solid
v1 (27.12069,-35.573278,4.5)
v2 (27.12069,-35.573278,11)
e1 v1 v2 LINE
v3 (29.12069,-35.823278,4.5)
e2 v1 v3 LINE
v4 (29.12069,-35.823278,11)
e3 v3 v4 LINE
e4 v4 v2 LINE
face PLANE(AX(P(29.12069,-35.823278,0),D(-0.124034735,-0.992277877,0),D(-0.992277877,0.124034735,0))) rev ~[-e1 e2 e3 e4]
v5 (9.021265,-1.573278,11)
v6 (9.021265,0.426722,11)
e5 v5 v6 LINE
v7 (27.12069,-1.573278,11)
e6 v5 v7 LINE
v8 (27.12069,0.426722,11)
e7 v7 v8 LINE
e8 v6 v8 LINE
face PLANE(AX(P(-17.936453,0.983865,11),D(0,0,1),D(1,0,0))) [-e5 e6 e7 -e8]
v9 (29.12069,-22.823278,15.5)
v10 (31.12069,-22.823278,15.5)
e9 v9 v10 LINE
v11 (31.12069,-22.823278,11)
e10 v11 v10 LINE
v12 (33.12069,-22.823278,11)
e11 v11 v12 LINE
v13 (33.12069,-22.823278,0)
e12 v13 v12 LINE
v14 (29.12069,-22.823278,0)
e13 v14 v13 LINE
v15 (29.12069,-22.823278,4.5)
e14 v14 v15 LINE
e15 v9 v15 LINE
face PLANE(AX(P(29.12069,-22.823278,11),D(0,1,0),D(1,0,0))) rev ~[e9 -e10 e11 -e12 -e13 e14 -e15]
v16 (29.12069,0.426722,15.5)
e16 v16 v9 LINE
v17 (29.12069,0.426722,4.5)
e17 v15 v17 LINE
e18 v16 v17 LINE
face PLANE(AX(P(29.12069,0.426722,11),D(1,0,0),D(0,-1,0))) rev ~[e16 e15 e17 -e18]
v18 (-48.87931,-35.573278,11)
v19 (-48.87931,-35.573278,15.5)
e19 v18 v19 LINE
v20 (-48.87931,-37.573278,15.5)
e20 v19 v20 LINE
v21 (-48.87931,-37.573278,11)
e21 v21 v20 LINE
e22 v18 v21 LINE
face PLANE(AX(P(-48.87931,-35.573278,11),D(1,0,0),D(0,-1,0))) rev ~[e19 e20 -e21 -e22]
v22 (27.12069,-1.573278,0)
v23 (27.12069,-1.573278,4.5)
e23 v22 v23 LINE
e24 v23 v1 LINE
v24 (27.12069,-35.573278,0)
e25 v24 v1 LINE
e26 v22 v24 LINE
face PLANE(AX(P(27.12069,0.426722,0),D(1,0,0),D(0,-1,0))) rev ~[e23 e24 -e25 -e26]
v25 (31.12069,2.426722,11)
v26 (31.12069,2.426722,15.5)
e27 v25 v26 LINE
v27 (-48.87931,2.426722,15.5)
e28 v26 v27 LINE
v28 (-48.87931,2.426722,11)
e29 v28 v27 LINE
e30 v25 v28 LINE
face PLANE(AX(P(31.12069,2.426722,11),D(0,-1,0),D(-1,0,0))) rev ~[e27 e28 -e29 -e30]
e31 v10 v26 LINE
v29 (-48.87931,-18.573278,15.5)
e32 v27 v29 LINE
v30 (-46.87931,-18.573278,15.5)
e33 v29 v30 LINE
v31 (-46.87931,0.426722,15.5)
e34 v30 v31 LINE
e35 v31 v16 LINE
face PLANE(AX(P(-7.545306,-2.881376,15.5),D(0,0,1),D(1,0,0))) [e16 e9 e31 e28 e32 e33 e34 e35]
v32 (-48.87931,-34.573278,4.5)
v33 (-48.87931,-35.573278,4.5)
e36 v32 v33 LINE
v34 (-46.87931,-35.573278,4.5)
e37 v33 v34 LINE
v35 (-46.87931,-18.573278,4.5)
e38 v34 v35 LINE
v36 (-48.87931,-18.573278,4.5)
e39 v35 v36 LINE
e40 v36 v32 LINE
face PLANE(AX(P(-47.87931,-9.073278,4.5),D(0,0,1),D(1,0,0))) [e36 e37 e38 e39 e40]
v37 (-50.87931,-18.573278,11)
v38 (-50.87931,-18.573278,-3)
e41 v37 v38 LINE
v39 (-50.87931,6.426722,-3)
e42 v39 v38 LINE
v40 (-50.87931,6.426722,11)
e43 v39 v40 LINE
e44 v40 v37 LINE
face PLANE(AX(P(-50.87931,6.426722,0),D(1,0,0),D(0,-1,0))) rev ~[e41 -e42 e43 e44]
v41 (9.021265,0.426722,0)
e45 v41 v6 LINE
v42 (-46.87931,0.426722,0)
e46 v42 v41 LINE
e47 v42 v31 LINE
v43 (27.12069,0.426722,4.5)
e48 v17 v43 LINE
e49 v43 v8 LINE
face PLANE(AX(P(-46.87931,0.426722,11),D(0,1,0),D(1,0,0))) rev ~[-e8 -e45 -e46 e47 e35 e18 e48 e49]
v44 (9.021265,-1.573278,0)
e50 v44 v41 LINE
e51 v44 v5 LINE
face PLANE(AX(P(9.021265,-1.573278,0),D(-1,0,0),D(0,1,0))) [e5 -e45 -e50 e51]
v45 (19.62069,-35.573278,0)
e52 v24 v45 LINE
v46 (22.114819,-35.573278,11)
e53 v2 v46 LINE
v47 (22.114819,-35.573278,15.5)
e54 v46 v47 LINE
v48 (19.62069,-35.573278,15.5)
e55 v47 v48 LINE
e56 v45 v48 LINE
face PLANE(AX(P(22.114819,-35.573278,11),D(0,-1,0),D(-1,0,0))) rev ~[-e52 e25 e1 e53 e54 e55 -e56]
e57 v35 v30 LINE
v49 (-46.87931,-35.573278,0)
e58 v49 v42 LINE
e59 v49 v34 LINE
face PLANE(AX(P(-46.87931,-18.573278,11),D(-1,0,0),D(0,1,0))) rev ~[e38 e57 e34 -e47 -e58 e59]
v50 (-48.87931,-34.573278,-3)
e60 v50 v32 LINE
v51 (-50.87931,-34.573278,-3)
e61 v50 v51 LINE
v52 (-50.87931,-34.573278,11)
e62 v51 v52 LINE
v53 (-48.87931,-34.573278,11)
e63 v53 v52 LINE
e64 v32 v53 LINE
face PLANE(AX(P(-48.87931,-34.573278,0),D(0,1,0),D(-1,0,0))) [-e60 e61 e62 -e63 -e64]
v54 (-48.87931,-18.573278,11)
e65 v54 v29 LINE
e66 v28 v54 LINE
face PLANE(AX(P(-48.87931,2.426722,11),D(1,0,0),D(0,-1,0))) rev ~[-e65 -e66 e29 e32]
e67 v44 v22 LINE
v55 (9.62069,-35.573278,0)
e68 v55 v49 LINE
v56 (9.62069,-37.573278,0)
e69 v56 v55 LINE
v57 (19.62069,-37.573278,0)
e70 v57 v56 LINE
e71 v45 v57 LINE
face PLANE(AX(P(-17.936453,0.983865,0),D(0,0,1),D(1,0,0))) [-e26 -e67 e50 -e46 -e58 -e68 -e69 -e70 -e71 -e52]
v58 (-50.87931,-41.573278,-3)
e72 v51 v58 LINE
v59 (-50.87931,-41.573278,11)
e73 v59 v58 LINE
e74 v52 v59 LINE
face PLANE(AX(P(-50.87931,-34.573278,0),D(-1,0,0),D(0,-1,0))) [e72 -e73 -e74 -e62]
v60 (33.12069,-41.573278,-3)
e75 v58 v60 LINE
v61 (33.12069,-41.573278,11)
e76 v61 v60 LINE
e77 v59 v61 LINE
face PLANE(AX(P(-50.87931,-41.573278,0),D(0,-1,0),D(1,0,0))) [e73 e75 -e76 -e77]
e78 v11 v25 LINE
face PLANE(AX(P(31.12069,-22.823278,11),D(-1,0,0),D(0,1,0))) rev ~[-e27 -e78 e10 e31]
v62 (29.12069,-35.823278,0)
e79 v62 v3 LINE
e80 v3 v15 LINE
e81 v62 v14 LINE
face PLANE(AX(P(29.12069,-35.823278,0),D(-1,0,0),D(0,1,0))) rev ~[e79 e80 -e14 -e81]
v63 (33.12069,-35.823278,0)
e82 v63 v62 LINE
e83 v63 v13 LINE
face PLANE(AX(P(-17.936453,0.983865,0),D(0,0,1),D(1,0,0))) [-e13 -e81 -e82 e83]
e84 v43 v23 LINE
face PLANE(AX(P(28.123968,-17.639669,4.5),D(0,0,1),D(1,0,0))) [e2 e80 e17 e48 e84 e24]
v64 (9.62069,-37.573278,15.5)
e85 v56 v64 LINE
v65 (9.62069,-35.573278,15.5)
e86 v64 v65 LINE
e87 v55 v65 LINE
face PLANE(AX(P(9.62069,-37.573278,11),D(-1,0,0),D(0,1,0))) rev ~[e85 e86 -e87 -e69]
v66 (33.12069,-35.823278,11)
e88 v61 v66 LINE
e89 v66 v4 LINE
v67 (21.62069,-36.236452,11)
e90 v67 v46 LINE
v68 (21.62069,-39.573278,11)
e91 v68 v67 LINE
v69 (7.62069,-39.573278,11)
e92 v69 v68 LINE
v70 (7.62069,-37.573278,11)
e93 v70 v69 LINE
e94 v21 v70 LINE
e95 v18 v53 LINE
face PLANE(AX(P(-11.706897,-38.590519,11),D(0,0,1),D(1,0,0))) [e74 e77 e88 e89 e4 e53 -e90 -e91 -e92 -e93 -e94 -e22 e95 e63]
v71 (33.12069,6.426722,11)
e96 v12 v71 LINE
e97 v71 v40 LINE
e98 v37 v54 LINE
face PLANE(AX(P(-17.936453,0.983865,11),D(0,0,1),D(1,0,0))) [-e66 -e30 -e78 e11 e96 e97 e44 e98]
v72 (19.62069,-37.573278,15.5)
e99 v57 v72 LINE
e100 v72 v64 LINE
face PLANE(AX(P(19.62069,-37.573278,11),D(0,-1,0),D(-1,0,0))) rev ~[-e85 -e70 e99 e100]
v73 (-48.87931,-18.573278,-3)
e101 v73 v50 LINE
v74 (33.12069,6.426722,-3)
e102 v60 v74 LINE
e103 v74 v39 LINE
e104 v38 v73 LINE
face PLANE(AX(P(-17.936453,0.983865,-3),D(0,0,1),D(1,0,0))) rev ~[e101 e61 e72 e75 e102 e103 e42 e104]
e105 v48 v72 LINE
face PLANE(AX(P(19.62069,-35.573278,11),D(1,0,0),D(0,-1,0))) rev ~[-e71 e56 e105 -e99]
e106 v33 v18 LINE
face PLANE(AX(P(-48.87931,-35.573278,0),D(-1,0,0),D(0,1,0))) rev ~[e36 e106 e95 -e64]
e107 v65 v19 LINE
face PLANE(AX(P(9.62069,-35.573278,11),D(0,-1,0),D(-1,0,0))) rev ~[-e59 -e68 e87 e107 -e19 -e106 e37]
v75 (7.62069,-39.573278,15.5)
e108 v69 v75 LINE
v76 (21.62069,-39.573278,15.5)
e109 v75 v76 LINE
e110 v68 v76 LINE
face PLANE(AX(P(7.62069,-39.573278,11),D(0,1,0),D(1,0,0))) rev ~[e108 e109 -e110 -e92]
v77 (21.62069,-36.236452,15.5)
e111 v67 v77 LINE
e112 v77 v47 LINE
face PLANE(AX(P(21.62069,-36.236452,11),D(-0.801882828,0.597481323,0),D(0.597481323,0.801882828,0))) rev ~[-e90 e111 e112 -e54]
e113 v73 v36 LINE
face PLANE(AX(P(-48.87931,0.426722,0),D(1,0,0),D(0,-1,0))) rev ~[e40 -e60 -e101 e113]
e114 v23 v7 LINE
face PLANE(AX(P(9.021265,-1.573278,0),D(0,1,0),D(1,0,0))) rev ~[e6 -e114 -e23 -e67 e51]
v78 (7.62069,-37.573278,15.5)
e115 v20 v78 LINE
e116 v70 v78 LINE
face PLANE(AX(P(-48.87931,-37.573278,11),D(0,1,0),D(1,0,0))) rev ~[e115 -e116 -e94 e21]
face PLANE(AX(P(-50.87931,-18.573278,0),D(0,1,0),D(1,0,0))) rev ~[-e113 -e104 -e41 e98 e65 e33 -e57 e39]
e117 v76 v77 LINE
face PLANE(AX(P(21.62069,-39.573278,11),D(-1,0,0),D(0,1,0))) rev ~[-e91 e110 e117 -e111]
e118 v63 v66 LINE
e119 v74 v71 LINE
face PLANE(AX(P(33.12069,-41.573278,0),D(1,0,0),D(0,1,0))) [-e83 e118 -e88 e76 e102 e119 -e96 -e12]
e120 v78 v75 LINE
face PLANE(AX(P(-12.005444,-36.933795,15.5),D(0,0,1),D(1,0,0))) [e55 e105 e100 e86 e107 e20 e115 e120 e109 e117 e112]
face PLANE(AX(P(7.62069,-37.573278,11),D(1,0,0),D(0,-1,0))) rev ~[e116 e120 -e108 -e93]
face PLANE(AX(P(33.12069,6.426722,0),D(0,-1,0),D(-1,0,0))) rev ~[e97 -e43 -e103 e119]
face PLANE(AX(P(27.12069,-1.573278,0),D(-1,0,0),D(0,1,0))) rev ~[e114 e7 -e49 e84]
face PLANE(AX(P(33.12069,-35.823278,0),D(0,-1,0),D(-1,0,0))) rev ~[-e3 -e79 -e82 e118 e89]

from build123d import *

# Parameters (mm, degrees)
F0_W     = 2
F0_H     = 19
F0_H_2   = 16
F0_W_2   = 18.0994240791
F0_H_3   = 2
F0_H_4   = 1
F0_H_5   = 23.25
F0_H_6   = 13
F0_H_7   = 6
F0_W_3   = 10
F0_H_8   = 5.75
F1_DEPTH = 3
F2_DEPTH = 4.5
F3_DEPTH = 11
F5_DEPTH = 4.5
F6_DEPTH = 4.5
F7_DEPTH = 4.5


# Not quite as in the source:
# - a feature names something its author has since deleted; it is built from what else it names


with BuildPart() as f1:
    # F0 (on Top) → F1 (new body)
    with BuildSketch(Plane.XY):
        Polygon((-48.8793104887, -18.5732776225), (-48.8793104887, 0.4267223775), (-46.8793104887, 0.4267223775), (9.0212654322, 0.4267223775), (27.1206895113, 0.4267223775), (29.1206895113, 0.4267223775), (29.1206895113, 6.4267223775), (-50.8793104887, 6.4267223775), (-50.8793104887, -1.5732776225), (-50.8793104887, -18.5732776225), align=None)
        with Locations((-47.8793104887, -9.0732776225)):
            Rectangle(F0_W, F0_H)
        Polygon((9.0212654322, 0.4267223775), (-46.8793104887, 0.4267223775), (-46.8793104887, -18.5732776225), (-46.8793104887, -34.5732776225), (-46.8793104887, -35.5732776225), (9.6206895113, -35.5732776225), (19.6206895113, -35.5732776225), (27.1206895113, -35.5732776225), (27.1206895113, -1.5732776225), (9.0212654322, -1.5732776225), align=None)
        with Locations((-47.8793104887, -26.5732776225)):
            Rectangle(F0_W, F0_H_2)
        with Locations((18.0709774718, -0.5732776225)):
            Rectangle(F0_W_2, F0_H_3)
        with Locations((-47.8793104887, -35.0732776225)):
            Rectangle(F0_W, F0_H_4)
        Polygon((-48.8793104887, -35.5732776225), (-48.8793104887, -34.5732776225), (-50.8793104887, -34.5732776225), (-50.8793104887, -35.5732776225), (-50.8793104887, -41.5732776225), (27.1206895113, -41.5732776225), (27.1206895113, -35.5732776225), (19.6206895113, -35.5732776225), (19.6206895113, -37.5732776225), (9.6206895113, -37.5732776225), (9.6206895113, -35.5732776225), (-46.8793104887, -35.5732776225), align=None)
        Polygon((29.1206895113, 0.4267223775), (27.1206895113, 0.4267223775), (27.1206895113, -1.5732776225), (27.1206895113, -35.5732776225), (29.1206895113, -35.8232776225), (29.1206895113, -22.8232776225), align=None)
        with Locations((30.1206895113, -11.1982776225)):
            Rectangle(F0_W, F0_H_5)
        Polygon((29.1206895113, 6.4267223775), (29.1206895113, 0.4267223775), (31.1206895113, 0.4267223775), (31.1206895113, 6.4267223775), (30.1206895113, 6.4267223775), align=None)
        with Locations((30.1206895113, -29.3232776225)):
            Rectangle(F0_W, F0_H_6)
        with Locations((32.1206895113, -11.1982776225)):
            Rectangle(F0_W, F0_H_5)
        with Locations((32.1206895113, 3.4267223775)):
            Rectangle(F0_W, F0_H_7)
        Polygon((29.1206895113, -35.8232776225), (27.1206895113, -35.5732776225), (27.1206895113, -41.5732776225), (29.1206895113, -41.5732776225), align=None)
        with Locations((14.6206895113, -36.5732776225)):
            Rectangle(F0_W_3, F0_H_3)
        Polygon((31.1206895113, -35.8232776225), (29.1206895113, -35.8232776225), (29.1206895113, -41.5732776225), (30.1206895113, -41.5732776225), (31.1206895113, -41.5732776225), align=None)
        with Locations((32.1206895113, -29.3232776225)):
            Rectangle(F0_W, F0_H_6)
        with Locations((32.1206895113, -38.6982776225)):
            Rectangle(F0_W, F0_H_8)
    extrude(amount=-F1_DEPTH)

    # F0 (on Top) → F2 (join)
    with BuildSketch(Plane.XY):
        with Locations((-47.8793104887, -9.0732776225)):
            Rectangle(F0_W, F0_H)
        with Locations((-47.8793104887, -26.5732776225)):
            Rectangle(F0_W, F0_H_2)
        with Locations((18.0709774718, -0.5732776225)):
            Rectangle(F0_W_2, F0_H_3)
        with Locations((-47.8793104887, -35.0732776225)):
            Rectangle(F0_W, F0_H_4)
    extrude(amount=F2_DEPTH)

    # F0 (on Top) → F3 (join)
    with BuildSketch(Plane.XY):
        Polygon((-48.8793104887, -18.5732776225), (-48.8793104887, 0.4267223775), (-46.8793104887, 0.4267223775), (9.0212654322, 0.4267223775), (27.1206895113, 0.4267223775), (29.1206895113, 0.4267223775), (29.1206895113, 6.4267223775), (-50.8793104887, 6.4267223775), (-50.8793104887, -1.5732776225), (-50.8793104887, -18.5732776225), align=None)
        with Locations((-47.8793104887, -9.0732776225)):
            Rectangle(F0_W, F0_H)
        with Locations((18.0709774718, -0.5732776225)):
            Rectangle(F0_W_2, F0_H_3)
        Polygon((-48.8793104887, -35.5732776225), (-48.8793104887, -34.5732776225), (-50.8793104887, -34.5732776225), (-50.8793104887, -35.5732776225), (-50.8793104887, -41.5732776225), (27.1206895113, -41.5732776225), (27.1206895113, -35.5732776225), (19.6206895113, -35.5732776225), (19.6206895113, -37.5732776225), (9.6206895113, -37.5732776225), (9.6206895113, -35.5732776225), (-46.8793104887, -35.5732776225), align=None)
        with Locations((30.1206895113, -11.1982776225)):
            Rectangle(F0_W, F0_H_5)
        Polygon((29.1206895113, 6.4267223775), (29.1206895113, 0.4267223775), (31.1206895113, 0.4267223775), (31.1206895113, 6.4267223775), (30.1206895113, 6.4267223775), align=None)
        with Locations((32.1206895113, -11.1982776225)):
            Rectangle(F0_W, F0_H_5)
        with Locations((32.1206895113, 3.4267223775)):
            Rectangle(F0_W, F0_H_7)
        Polygon((29.1206895113, -35.8232776225), (27.1206895113, -35.5732776225), (27.1206895113, -41.5732776225), (29.1206895113, -41.5732776225), align=None)
        Polygon((31.1206895113, -35.8232776225), (29.1206895113, -35.8232776225), (29.1206895113, -41.5732776225), (30.1206895113, -41.5732776225), (31.1206895113, -41.5732776225), align=None)
        with Locations((32.1206895113, -38.6982776225)):
            Rectangle(F0_W, F0_H_8)
    extrude(amount=F3_DEPTH)

    # F4 (on face) → F5 (join)
    with BuildSketch(Plane.XY.offset(11)):
        Polygon((22.1148194903, -35.5732776225), (19.6206895113, -35.5732776225), (19.6206895113, -37.5732776225), (9.6206895113, -37.5732776225), (9.6206895113, -35.5732776225), (-48.8793104887, -35.5732776225), (-48.8793104887, -37.5732776225), (7.6206895113, -37.5732776225), (7.6206895113, -39.5732776225), (21.6206895113, -39.5732776225), (21.6206895113, -36.236452068), align=None)
    extrude(amount=F5_DEPTH)

    # F0 (on Top) → F6 (join)
    with BuildSketch(Plane.XY):
        Polygon((29.1206895113, 0.4267223775), (27.1206895113, 0.4267223775), (27.1206895113, -1.5732776225), (27.1206895113, -35.5732776225), (29.1206895113, -35.8232776225), (29.1206895113, -22.8232776225), align=None)
    extrude(amount=F6_DEPTH)

    # F4 (on face) → F7 (join)
    with BuildSketch(Plane.XY.offset(11)):
        Polygon((31.1206895113, -22.8232776225), (31.1206895113, 2.4267223775), (29.1206895113, 2.4267223775), (-48.8793104887, 2.4267223775), (-48.8793104887, -18.5732776225), (-46.8793104887, -18.5732776225), (-46.8793104887, 0.4267223775), (29.1206895113, 0.4267223775), (29.1206895113, -22.8232776225), align=None)
    extrude(amount=F7_DEPTH)


solid = f1.part
